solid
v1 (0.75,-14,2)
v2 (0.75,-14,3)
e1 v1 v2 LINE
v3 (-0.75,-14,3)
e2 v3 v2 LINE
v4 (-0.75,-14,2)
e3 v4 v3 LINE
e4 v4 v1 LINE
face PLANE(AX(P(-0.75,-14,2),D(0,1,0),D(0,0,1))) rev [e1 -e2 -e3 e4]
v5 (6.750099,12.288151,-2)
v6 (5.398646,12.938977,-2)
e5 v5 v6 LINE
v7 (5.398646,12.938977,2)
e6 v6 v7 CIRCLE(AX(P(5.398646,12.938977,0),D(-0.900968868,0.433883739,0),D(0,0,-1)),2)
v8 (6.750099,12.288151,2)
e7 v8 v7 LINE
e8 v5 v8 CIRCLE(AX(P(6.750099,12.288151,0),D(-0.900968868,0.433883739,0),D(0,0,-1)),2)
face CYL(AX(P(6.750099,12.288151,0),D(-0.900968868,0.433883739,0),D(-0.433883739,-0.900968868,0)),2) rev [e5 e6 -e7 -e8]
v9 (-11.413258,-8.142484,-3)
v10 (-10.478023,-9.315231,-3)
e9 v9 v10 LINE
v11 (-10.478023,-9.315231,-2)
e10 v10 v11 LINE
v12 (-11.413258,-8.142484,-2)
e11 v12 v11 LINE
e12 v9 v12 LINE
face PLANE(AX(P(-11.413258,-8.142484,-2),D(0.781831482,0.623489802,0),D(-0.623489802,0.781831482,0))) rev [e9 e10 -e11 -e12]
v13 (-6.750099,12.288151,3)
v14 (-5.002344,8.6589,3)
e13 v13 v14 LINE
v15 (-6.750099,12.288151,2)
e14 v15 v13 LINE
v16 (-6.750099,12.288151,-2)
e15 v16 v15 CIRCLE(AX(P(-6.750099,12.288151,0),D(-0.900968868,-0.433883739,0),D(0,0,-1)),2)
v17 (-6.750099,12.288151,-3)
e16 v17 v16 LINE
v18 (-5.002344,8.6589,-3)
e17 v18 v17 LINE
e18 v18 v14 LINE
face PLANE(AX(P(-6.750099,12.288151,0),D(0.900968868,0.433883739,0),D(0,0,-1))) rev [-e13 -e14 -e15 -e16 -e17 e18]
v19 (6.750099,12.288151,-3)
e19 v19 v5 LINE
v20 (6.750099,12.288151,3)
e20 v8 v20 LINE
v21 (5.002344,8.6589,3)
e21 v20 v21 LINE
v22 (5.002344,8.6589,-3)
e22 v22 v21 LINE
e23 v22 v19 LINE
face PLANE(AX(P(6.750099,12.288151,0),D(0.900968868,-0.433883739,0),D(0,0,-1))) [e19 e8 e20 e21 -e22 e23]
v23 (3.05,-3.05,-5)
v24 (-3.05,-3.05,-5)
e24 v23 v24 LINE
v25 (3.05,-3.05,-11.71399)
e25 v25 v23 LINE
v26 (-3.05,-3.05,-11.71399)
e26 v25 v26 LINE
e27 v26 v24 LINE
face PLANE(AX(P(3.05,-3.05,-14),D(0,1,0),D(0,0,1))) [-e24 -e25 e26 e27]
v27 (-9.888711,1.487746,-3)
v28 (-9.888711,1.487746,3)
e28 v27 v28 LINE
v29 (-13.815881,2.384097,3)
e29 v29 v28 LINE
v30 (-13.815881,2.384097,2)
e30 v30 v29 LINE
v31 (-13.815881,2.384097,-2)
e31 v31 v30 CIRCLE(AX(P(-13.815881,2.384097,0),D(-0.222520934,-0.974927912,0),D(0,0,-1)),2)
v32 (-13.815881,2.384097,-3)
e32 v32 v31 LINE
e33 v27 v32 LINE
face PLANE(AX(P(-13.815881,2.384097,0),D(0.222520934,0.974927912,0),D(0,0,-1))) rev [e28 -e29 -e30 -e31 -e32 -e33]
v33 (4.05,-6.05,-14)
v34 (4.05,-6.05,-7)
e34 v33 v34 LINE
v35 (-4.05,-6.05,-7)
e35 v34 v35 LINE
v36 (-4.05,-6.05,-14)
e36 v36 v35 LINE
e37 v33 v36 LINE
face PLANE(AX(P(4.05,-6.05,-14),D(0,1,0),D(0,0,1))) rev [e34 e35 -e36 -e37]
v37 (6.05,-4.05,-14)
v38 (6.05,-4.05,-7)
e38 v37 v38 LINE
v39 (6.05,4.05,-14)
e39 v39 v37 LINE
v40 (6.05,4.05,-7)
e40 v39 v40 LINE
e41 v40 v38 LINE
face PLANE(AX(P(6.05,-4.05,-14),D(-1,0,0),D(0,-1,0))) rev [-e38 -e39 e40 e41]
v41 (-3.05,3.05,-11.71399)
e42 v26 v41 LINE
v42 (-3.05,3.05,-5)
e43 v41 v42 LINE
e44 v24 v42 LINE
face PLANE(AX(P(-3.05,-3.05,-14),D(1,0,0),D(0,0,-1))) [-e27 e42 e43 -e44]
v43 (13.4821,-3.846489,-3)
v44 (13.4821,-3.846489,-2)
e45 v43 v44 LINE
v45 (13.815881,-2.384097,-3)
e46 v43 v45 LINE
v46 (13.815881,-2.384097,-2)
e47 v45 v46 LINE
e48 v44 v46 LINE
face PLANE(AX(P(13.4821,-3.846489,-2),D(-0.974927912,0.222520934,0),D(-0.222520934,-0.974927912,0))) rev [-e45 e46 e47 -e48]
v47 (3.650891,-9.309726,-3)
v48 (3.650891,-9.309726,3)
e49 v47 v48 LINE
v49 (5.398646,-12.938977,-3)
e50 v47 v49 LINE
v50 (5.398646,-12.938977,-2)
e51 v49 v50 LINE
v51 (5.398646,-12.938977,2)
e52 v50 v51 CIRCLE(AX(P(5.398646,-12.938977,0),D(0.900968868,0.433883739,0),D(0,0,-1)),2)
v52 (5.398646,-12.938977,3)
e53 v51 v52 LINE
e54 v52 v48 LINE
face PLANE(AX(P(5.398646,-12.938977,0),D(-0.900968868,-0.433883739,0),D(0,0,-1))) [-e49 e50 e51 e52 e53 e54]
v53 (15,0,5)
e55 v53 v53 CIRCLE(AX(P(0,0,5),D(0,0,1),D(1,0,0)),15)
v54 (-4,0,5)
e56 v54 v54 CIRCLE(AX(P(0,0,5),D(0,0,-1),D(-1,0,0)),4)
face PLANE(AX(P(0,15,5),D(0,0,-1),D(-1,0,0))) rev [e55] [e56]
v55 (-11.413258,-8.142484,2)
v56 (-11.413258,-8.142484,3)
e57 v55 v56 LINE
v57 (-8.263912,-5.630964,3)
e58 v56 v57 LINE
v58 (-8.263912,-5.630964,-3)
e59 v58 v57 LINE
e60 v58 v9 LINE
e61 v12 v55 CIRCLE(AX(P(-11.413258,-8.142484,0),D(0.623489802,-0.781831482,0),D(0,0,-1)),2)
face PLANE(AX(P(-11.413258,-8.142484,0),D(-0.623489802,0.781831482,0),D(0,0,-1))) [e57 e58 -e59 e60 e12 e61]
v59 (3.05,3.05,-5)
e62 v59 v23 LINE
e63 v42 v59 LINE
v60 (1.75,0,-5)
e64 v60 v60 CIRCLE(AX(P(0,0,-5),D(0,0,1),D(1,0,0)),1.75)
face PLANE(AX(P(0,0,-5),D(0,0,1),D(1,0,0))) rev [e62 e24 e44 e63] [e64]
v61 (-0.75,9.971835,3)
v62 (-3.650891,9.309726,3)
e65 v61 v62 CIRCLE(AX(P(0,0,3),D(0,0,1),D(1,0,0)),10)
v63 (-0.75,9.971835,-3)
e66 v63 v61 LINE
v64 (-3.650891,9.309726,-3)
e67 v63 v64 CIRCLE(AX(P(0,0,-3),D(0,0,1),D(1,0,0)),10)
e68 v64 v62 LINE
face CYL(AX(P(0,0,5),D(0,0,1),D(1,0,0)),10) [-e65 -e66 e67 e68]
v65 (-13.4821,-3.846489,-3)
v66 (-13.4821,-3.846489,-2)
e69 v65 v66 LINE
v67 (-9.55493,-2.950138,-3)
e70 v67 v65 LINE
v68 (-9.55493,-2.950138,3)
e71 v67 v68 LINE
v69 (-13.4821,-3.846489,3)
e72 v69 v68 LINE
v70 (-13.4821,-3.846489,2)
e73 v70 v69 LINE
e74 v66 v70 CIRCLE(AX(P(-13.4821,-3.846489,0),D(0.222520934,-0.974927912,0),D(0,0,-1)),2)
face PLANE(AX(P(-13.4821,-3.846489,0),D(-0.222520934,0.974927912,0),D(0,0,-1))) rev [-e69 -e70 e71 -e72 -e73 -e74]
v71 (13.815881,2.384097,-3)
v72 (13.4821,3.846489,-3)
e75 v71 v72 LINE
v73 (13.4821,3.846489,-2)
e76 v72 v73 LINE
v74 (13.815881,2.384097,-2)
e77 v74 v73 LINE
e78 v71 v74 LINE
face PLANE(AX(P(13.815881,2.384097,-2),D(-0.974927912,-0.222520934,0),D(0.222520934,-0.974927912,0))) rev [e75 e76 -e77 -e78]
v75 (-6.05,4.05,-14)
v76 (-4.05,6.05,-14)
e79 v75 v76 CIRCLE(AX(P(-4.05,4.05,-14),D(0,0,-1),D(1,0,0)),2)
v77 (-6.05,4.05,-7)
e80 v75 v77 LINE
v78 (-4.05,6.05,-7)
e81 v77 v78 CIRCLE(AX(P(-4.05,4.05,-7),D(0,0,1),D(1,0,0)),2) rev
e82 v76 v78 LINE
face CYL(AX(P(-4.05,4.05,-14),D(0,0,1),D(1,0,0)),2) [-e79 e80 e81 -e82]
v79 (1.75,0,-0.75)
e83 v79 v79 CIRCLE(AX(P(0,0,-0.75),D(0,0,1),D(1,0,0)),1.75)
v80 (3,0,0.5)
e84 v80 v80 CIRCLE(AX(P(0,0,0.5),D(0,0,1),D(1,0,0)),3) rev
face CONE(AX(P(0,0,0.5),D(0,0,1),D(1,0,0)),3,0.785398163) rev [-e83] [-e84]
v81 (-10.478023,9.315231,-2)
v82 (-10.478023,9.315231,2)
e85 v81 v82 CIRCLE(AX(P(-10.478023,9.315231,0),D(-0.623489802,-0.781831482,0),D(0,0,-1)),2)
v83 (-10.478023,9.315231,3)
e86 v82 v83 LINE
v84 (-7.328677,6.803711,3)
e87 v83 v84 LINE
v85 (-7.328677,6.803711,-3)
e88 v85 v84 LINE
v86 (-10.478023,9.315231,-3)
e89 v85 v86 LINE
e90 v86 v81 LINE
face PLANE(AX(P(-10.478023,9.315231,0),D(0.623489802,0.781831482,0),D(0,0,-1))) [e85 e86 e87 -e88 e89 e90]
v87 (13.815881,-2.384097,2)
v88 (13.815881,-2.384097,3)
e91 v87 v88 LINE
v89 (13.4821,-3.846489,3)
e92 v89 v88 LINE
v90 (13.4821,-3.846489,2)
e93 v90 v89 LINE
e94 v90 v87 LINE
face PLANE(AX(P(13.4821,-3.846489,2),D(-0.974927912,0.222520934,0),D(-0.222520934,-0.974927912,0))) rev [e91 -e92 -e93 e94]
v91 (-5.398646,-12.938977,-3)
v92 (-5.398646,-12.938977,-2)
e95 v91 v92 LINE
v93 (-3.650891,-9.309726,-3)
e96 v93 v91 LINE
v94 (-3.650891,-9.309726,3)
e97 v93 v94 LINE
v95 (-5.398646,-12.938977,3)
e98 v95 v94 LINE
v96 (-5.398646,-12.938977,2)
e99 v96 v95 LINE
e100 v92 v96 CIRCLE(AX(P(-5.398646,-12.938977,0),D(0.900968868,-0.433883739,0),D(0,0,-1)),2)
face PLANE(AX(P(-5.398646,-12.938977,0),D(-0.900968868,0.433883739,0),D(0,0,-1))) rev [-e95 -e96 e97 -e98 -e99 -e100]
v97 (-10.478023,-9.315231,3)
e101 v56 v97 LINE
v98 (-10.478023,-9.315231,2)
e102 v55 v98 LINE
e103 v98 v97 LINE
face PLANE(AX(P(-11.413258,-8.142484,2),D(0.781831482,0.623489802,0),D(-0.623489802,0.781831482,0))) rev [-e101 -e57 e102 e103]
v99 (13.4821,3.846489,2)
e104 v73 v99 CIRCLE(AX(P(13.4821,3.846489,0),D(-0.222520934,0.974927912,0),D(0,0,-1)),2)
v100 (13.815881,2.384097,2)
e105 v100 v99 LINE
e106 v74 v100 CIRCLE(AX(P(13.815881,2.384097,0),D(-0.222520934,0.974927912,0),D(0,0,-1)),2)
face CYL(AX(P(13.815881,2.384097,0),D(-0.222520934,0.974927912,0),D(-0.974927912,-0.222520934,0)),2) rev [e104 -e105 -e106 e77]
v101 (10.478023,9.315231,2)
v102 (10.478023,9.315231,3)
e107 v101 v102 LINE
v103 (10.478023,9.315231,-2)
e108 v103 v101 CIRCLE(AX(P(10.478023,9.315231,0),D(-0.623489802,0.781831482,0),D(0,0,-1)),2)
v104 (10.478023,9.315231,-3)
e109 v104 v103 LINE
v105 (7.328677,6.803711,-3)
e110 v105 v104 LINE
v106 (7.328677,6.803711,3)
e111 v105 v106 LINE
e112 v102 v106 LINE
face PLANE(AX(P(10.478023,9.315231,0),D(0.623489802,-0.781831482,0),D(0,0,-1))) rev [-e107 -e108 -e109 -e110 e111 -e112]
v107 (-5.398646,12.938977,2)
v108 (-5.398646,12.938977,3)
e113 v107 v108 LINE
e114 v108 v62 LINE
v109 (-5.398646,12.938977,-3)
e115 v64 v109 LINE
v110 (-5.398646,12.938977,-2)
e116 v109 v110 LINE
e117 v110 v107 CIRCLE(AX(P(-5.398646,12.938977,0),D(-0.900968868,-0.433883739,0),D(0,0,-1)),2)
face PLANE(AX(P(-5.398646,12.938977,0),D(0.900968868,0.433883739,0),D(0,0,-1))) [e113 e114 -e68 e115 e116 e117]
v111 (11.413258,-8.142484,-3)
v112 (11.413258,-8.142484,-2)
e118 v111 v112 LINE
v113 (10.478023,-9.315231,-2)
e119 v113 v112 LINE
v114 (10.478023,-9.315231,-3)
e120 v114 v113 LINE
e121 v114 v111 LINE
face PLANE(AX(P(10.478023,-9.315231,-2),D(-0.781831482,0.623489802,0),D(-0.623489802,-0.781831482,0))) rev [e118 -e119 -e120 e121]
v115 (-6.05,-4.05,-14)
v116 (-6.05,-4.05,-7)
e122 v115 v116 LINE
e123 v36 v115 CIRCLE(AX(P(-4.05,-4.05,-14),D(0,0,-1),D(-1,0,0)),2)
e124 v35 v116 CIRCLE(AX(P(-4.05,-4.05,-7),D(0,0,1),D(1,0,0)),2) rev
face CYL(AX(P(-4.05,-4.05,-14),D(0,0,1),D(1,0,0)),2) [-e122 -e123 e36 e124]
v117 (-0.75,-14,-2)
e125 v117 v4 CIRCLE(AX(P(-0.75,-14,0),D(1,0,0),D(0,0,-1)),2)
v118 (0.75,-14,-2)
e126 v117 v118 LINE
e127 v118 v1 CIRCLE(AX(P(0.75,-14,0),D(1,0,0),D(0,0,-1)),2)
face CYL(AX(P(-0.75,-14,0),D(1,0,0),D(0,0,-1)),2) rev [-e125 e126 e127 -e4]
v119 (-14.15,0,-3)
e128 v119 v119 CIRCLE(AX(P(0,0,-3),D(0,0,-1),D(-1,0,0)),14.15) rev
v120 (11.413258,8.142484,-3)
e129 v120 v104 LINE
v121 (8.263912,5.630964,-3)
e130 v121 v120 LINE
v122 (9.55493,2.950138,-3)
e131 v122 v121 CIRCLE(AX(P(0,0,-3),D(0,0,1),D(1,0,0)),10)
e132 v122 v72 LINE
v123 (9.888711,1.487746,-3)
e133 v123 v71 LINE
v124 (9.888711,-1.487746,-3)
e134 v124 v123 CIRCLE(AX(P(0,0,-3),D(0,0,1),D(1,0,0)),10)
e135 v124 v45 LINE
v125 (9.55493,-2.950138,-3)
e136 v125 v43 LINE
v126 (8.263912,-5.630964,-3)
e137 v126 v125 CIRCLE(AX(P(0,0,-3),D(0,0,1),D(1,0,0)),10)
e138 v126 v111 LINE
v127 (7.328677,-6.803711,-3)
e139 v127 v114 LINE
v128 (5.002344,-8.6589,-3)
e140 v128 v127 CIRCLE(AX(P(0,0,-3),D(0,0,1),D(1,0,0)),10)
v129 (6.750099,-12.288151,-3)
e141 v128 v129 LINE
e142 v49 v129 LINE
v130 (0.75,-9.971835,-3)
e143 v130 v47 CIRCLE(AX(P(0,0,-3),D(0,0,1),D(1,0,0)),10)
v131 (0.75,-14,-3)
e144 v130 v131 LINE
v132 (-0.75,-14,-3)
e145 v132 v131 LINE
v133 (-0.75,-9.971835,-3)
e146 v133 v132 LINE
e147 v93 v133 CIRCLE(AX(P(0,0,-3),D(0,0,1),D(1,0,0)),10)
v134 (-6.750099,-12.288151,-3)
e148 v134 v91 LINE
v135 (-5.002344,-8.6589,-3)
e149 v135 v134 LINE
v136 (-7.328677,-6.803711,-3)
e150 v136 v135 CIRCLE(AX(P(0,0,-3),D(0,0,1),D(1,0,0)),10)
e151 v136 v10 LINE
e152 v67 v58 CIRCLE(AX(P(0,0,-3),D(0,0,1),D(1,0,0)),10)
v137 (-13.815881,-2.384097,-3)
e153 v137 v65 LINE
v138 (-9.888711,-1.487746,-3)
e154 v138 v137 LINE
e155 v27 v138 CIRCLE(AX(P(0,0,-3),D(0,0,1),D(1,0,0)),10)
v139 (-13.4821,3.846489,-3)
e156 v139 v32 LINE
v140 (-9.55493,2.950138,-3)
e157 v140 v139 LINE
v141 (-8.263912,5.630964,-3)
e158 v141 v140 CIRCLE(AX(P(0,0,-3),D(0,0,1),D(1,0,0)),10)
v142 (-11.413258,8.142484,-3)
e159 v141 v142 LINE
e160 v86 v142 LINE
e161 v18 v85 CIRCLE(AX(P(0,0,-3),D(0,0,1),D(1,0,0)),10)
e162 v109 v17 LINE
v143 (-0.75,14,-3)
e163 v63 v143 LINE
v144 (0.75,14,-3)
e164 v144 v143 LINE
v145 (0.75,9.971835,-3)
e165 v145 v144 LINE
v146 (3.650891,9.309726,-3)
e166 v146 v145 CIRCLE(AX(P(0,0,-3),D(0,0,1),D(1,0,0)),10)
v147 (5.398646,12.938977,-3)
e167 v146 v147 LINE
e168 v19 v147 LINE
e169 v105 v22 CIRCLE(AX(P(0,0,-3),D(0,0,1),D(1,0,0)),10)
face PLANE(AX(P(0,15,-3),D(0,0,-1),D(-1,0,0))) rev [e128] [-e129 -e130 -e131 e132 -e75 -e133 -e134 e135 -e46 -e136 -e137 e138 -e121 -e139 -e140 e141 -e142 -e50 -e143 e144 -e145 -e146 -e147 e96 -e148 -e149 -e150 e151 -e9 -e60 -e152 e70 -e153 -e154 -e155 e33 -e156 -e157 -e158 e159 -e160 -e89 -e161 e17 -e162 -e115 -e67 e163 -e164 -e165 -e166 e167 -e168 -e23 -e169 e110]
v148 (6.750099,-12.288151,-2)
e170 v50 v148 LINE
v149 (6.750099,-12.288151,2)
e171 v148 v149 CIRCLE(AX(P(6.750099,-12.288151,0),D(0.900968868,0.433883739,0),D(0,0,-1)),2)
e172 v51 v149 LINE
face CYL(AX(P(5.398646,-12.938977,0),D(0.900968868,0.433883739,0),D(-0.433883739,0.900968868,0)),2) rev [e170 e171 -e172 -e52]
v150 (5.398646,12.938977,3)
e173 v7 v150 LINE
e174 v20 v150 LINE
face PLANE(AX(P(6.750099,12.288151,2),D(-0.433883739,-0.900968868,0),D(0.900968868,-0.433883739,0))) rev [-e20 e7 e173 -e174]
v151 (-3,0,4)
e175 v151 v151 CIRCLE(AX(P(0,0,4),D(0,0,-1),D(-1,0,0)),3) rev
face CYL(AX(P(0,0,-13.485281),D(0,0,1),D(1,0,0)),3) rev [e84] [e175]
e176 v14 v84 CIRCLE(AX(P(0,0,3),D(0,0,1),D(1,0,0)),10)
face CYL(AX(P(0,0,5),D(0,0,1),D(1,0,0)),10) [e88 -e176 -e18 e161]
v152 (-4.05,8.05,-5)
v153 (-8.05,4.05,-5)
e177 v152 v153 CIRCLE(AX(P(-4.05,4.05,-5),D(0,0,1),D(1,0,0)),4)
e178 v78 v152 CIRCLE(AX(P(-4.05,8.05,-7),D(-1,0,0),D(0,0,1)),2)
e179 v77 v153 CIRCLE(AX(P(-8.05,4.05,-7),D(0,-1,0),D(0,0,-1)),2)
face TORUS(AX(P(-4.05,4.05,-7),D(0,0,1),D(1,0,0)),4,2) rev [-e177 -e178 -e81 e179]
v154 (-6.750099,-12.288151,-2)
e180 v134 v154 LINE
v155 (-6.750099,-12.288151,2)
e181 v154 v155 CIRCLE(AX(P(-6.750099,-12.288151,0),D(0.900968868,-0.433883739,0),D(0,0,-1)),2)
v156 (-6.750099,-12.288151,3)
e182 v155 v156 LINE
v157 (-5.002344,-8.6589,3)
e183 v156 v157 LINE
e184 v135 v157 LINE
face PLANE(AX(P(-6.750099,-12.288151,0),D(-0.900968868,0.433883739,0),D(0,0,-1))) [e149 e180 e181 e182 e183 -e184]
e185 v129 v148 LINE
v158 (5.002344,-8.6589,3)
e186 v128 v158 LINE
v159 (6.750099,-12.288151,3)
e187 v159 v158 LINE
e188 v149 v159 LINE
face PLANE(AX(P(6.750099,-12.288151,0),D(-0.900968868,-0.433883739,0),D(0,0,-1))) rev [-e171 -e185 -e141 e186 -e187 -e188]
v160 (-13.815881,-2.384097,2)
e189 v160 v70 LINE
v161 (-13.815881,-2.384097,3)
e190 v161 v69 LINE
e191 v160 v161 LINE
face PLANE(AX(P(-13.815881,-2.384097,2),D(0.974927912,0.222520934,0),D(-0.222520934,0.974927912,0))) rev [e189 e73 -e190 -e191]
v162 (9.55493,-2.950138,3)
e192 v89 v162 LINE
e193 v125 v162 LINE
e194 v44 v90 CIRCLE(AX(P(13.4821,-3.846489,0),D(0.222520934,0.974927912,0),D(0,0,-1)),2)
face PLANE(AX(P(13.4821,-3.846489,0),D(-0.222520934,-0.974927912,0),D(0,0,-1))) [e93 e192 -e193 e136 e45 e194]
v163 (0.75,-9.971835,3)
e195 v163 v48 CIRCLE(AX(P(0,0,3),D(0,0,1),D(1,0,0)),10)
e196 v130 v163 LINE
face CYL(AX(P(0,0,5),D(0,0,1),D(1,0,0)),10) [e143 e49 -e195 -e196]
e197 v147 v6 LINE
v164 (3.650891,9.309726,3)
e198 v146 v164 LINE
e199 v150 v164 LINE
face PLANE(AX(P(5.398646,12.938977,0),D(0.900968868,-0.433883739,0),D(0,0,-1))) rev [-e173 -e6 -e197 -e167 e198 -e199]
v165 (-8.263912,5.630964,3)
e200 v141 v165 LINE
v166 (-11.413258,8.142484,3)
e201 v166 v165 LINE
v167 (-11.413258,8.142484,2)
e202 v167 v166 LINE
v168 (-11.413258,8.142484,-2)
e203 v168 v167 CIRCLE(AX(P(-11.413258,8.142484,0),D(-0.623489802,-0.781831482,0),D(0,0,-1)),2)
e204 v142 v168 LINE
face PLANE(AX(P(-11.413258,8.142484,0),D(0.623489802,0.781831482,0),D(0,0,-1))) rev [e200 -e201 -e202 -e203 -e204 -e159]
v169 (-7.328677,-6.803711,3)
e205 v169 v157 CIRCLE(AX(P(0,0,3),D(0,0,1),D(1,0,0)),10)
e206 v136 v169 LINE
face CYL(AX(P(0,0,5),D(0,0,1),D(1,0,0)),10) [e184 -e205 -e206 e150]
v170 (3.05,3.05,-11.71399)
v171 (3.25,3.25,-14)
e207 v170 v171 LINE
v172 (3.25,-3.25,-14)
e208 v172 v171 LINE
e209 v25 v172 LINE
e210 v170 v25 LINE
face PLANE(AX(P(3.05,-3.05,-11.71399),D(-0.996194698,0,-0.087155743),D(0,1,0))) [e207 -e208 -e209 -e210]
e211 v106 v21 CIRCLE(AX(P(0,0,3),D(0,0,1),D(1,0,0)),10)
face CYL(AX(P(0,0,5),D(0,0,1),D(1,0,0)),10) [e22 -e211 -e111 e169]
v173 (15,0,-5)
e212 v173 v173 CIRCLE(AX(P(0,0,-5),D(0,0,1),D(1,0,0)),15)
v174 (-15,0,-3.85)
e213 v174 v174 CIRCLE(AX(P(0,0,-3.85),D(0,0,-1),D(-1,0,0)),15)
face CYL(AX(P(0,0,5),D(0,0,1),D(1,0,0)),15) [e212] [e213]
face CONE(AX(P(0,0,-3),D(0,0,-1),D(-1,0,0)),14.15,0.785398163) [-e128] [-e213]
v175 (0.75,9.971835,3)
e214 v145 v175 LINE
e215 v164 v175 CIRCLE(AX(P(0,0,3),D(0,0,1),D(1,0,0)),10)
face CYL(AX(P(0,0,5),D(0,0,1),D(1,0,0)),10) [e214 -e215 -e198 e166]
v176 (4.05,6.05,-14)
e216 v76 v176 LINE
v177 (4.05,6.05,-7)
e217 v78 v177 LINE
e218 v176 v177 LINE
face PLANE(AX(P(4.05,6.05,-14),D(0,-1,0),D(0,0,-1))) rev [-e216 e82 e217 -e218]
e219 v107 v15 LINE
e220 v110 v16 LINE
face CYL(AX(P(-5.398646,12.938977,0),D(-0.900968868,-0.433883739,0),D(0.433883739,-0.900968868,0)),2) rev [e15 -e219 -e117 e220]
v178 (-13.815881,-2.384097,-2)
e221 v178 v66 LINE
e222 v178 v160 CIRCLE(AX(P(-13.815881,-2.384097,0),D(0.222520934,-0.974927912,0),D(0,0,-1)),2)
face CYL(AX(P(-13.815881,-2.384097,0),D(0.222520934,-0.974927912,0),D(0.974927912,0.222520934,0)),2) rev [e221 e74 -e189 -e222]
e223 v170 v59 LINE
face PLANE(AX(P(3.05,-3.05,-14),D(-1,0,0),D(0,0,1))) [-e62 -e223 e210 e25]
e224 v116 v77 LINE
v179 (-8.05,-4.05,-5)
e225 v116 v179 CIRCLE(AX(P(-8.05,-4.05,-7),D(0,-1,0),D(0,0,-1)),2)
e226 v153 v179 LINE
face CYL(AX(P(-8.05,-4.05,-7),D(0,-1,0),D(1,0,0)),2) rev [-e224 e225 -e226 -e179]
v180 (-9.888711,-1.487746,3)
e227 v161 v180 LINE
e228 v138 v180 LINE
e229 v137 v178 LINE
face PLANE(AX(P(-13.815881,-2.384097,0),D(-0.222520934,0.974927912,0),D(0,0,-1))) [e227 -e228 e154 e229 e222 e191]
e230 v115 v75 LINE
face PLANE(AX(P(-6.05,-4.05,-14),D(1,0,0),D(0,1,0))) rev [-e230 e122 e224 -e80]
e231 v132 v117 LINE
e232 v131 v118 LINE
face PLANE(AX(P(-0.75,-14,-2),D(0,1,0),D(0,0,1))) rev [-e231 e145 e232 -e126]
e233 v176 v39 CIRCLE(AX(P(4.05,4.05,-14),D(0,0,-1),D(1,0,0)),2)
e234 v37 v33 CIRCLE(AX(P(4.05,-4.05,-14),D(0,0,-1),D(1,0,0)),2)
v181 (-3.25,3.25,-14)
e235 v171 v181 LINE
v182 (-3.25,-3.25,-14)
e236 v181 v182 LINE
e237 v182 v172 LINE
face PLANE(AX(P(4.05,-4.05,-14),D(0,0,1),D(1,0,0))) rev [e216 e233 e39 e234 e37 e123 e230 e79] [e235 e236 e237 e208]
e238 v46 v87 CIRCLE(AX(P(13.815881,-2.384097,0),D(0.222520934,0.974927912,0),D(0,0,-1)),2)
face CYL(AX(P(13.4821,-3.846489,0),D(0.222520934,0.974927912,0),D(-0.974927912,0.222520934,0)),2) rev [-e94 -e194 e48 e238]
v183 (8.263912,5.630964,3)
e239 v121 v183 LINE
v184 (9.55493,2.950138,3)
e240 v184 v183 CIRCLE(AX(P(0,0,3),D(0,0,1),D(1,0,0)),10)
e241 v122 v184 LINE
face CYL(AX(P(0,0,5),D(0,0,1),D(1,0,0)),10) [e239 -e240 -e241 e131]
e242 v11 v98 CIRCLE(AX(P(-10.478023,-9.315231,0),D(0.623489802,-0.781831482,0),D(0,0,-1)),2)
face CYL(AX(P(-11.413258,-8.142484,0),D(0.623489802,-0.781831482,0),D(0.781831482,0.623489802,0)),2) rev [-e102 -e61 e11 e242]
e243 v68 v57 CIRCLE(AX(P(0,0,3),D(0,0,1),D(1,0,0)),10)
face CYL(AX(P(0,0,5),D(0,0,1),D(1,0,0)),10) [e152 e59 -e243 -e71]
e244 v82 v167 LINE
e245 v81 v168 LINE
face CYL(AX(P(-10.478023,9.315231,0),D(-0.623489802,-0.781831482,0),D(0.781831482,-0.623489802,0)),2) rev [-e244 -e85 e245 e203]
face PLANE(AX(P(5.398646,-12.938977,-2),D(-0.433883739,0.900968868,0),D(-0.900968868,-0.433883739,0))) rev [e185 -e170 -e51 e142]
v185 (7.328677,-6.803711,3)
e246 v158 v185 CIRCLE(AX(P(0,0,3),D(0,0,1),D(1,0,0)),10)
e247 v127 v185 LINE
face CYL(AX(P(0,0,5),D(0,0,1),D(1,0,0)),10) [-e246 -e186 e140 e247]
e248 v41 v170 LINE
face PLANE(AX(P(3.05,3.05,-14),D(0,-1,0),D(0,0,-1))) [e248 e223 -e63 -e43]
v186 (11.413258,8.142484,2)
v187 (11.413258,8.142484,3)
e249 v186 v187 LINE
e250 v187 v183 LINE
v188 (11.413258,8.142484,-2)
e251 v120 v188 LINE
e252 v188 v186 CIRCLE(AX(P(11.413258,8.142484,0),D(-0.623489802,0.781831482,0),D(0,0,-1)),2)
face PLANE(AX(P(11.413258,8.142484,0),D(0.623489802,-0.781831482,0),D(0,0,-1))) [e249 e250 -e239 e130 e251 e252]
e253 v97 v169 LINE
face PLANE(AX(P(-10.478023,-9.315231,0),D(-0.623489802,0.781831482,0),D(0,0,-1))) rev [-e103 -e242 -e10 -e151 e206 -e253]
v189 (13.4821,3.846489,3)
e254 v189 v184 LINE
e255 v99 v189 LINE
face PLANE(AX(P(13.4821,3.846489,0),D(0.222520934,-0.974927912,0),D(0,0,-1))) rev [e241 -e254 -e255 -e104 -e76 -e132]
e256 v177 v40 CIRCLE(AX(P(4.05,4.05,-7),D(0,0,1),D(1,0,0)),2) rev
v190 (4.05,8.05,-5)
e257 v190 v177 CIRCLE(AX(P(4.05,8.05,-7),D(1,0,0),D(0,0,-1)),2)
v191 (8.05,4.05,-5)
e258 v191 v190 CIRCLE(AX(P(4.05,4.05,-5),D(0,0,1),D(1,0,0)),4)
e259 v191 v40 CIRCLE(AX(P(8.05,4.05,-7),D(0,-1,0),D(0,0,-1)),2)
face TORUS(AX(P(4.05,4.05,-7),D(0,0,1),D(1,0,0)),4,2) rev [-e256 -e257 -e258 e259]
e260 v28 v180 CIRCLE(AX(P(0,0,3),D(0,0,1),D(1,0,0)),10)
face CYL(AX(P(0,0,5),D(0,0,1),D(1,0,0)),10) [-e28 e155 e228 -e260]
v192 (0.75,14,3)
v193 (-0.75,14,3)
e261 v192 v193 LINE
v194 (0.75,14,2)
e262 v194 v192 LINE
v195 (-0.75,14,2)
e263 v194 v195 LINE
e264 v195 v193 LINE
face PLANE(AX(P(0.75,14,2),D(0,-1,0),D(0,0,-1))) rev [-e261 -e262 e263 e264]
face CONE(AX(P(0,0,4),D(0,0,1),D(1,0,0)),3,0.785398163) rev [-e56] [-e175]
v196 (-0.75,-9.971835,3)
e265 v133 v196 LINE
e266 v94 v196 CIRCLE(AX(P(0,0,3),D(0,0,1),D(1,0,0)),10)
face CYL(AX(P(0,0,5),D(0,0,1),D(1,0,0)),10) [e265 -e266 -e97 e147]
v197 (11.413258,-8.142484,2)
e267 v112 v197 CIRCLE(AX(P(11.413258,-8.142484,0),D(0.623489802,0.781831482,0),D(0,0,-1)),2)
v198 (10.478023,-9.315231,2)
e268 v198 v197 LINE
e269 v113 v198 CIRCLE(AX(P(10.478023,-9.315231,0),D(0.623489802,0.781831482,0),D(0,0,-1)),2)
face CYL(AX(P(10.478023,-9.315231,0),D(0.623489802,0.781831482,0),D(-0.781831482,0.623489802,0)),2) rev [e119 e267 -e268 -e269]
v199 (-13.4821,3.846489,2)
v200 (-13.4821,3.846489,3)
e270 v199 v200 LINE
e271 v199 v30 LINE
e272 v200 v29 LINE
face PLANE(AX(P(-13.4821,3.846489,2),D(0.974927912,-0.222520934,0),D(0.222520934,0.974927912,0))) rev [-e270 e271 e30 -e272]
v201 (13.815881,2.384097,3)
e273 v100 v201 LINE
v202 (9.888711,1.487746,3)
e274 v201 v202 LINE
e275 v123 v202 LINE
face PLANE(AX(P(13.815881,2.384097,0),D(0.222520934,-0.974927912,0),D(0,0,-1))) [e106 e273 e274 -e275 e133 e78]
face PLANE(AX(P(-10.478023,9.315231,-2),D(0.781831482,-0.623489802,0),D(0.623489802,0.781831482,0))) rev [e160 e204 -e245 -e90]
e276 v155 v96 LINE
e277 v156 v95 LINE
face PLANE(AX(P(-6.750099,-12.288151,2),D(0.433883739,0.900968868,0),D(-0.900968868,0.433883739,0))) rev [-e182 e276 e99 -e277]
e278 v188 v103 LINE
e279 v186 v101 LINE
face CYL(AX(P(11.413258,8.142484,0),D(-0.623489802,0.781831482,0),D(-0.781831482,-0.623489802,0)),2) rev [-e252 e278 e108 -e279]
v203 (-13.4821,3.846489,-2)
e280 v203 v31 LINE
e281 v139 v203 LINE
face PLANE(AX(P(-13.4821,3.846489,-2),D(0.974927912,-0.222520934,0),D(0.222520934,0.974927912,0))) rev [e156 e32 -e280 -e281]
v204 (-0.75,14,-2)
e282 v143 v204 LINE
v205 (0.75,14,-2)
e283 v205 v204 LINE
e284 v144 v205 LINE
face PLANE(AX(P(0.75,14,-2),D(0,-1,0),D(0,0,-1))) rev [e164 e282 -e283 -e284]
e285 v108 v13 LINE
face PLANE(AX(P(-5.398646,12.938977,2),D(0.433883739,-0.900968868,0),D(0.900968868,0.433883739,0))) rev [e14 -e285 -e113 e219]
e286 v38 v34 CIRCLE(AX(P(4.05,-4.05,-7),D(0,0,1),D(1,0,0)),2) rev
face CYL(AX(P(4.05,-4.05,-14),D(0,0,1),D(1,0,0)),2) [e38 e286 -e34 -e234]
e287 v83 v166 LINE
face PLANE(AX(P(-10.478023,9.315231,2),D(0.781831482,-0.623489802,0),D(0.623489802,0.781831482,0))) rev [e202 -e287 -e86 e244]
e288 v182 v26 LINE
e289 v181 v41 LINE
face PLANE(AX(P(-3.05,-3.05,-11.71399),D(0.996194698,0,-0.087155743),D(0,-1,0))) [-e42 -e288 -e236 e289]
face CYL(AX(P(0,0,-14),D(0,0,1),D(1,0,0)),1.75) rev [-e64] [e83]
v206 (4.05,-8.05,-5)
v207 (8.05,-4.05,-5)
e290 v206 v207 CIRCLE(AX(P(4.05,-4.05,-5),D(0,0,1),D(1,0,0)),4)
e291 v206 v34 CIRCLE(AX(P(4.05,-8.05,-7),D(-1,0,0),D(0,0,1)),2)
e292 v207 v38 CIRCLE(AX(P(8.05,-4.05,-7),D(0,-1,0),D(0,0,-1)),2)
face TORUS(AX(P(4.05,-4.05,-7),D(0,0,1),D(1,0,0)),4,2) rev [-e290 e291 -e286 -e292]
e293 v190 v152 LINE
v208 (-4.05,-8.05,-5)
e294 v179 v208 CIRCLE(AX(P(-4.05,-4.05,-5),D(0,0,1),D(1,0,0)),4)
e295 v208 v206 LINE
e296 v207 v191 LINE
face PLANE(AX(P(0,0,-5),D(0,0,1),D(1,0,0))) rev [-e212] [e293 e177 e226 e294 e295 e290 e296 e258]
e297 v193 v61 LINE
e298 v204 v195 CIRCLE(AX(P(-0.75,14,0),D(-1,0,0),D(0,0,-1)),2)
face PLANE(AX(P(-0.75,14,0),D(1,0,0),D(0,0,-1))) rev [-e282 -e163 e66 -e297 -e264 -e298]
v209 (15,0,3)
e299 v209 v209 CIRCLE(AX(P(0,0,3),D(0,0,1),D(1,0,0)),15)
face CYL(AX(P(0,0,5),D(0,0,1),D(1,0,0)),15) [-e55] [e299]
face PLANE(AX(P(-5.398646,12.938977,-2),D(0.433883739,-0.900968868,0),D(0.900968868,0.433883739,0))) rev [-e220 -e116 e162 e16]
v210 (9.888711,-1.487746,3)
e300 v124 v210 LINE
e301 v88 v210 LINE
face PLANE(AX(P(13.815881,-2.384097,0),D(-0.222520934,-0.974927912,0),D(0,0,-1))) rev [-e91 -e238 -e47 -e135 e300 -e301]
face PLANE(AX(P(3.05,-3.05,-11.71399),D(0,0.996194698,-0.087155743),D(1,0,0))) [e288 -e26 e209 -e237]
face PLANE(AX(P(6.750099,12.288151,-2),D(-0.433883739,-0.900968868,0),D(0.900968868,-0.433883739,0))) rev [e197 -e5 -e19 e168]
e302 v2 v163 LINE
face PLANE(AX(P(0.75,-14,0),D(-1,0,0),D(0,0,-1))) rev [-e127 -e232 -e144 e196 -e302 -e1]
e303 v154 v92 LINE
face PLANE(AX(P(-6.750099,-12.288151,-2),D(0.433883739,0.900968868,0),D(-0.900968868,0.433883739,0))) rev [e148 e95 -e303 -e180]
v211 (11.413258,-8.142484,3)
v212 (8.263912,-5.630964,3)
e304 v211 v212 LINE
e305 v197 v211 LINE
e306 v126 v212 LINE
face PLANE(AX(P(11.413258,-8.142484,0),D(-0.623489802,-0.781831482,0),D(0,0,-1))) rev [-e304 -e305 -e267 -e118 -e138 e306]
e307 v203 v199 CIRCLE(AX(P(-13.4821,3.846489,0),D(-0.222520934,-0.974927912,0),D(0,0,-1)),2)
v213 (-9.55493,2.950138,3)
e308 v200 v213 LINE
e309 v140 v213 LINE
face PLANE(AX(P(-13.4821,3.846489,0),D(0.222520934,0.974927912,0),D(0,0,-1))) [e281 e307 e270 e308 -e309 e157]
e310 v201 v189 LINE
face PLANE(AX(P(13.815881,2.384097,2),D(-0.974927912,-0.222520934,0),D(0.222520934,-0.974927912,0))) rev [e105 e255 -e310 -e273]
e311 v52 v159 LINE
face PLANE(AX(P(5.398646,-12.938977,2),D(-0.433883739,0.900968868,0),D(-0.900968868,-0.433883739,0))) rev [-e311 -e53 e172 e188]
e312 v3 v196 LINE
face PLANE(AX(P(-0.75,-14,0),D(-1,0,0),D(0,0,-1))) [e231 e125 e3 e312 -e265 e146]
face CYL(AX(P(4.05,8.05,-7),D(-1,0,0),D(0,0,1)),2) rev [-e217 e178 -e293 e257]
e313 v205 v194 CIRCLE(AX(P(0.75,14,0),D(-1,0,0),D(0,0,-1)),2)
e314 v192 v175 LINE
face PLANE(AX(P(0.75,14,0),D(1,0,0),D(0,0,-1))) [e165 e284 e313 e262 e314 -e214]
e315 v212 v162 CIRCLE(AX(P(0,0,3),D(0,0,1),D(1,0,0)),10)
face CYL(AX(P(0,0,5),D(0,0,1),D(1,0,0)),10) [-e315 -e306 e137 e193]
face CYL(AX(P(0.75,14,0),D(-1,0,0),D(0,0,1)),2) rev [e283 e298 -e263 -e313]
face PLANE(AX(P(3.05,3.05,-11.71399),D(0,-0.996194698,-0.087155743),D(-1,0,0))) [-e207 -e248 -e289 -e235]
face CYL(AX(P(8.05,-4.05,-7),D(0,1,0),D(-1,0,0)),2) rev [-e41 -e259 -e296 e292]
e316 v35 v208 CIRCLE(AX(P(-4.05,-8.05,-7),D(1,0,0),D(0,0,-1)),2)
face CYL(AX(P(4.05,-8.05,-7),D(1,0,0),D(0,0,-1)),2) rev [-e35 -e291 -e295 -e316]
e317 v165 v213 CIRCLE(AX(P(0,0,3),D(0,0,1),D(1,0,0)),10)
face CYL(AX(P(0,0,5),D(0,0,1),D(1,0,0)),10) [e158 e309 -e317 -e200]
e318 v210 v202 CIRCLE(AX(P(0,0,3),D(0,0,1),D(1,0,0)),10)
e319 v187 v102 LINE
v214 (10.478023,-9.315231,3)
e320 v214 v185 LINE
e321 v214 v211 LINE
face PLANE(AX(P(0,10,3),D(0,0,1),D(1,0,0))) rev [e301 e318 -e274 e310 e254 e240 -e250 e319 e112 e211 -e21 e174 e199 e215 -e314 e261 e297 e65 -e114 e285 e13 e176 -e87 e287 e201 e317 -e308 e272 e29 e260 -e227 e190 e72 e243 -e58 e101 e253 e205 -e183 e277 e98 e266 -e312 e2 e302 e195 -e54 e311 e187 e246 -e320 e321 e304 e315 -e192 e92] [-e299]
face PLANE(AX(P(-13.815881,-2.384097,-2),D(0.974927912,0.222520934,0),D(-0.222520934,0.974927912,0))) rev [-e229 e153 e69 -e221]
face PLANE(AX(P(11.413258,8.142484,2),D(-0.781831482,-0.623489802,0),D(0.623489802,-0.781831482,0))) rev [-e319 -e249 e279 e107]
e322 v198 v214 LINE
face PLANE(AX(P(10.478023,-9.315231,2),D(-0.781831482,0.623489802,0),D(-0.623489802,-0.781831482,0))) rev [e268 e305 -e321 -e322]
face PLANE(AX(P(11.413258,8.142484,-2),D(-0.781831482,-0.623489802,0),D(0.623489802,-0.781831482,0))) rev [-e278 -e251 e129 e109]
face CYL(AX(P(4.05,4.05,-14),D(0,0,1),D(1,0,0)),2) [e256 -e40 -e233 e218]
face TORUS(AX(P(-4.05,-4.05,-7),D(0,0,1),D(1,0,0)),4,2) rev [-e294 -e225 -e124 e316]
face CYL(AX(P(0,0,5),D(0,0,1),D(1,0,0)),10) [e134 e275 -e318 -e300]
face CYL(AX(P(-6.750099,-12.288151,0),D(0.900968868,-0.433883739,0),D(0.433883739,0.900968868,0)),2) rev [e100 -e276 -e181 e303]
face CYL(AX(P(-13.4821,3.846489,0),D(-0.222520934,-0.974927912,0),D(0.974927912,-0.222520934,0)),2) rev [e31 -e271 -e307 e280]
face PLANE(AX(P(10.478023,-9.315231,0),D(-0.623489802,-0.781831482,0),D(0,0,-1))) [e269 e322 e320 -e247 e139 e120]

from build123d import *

# Parameters (mm, degrees)
EXTRUDE_1_DEPTH          = 0.75
PATTERN_CIRCULAR_1_COUNT = 14
SKETCH_3_W               = 6.1
SKETCH_3_H               = 6.1
EXTRUDE_2_DEPTH          = 9
FILLET_1_R               = 2
CHAMFER_1_SIZE           = 0.2
CHAMFER_1_SIZE2          = 2.286010461
SKETCH_4_R               = 1.75
CUT_EXTRUDE_1_DEPTH      = 29.478061732
SKETCH_6_R               = 3
CUT_EXTRUDE_2_DEPTH      = 6
CHAMFER_2_SIZE           = 1
CHAMFER_3_SIZE           = 1.5
CHAMFER_4_SIZE           = 0.85


with BuildPart() as part:
    # 草圖1 → 旋轉1 (revolve)
    with BuildSketch(Plane(origin=(0, 0, 0), x_dir=(0, 0, -1), z_dir=(1, 0, 0)), mode=Mode.PRIVATE) as revolve_1_sk:
        Polygon((-5, 0), (5, 0), (5, 15), (3, 15), (3, 10), (-3, 10), (-3, 15), (-5, 15), align=None)
    revolve(revolve_1_sk.sketch.rotate(Axis((0, 0, 5), (0, 0, -1)), 90), axis=Axis((0, 0, 5), (0, 0, -1)))

    # 草圖2 → 填料-伸長1 (add, symmetric)
    with BuildSketch(Plane(origin=(0, 0, 0), x_dir=(0, 0, -1), z_dir=(1, 0, 0))):
        with BuildLine():
            Line((3, 10), (3, 14))
            Line((3, 14), (2, 14))
            ThreePointArc((2, 14), (0, 12), (-2, 14))
            Line((-2, 14), (-3, 14))
            Line((-3, 14), (-3, 10))
            Line((-3, 10), (-3, 8.5))
            Line((-3, 8.5), (3, 8.5))
            Line((3, 8.5), (3, 10))
        make_face()
    extrude_1 = extrude(amount=EXTRUDE_1_DEPTH, both=True)

    # 環狀複製排列1: 填料-伸長1 ×14 about axis
    pattern_circular_1_axis = Axis((0, 0, 0), (0, 0, 1))
    for i in range(1, PATTERN_CIRCULAR_1_COUNT):
        add(extrude_1.rotate(pattern_circular_1_axis, i * 360 / PATTERN_CIRCULAR_1_COUNT))

    # 草圖3 → 填料-伸長2 (add)
    with BuildSketch(Plane(origin=(0, 0, -5), x_dir=(-1, 0, 0), z_dir=(0, 0, -1))):
        with BuildLine():
            Line((-4.05, -6.05), (4.05, -6.05))
            ThreePointArc((4.05, -6.05), (5.464213562, -5.464213562), (6.05, -4.05))
            Line((6.05, -4.05), (6.05, 4.05))
            ThreePointArc((6.05, 4.05), (5.464213562, 5.464213562), (4.05, 6.05))
            Line((4.05, 6.05), (-4.05, 6.05))
            ThreePointArc((-4.05, 6.05), (-5.464213562, 5.464213562), (-6.05, 4.05))
            Line((-6.05, 4.05), (-6.05, -4.05))
            ThreePointArc((-6.05, -4.05), (-5.464213562, -5.464213562), (-4.05, -6.05))
        make_face()
        Rectangle(SKETCH_3_W, SKETCH_3_H, mode=Mode.SUBTRACT)
    extrude(amount=EXTRUDE_2_DEPTH)

    # 圓角1
    fillet_1_edges = [part.edges().sort_by_distance(p)[0] for p in [
        (5.464213562, -5.464213562, -5),
        (0, -6.05, -5),
        (-5.464213562, -5.464213562, -5),
        (-6.05, 0, -5),
        (-5.464213562, 5.464213562, -5),
        (0, 6.05, -5),
        (5.464213562, 5.464213562, -5),
        (6.05, 0, -5),
    ]]
    fillet(fillet_1_edges, radius=FILLET_1_R)

    # 導角1
    chamfer_1_edges = [part.edges().sort_by_distance(p)[0] for p in [
        (-3.05, 0, -14),
        (0, 3.05, -14),
        (3.05, 0, -14),
        (0, -3.05, -14),
    ]]
    chamfer_1_side = [part.faces().sort_by_distance(p)[0] for p in [
        (5.343213562, -5.343213562, -14),
    ]]
    chamfer(chamfer_1_edges, length=CHAMFER_1_SIZE, length2=CHAMFER_1_SIZE2, reference=chamfer_1_side[0])

    # 草圖4 → 除料-伸長1 (cut, through all)
    with BuildSketch(Plane.XY.offset(5)):
        Circle(SKETCH_4_R)
    extrude(amount=-CUT_EXTRUDE_1_DEPTH, mode=Mode.SUBTRACT)

    # 草圖6 → 除料-伸長2 (cut)
    with BuildSketch(Plane.XY.offset(5)):
        Circle(SKETCH_6_R)
    extrude(amount=-CUT_EXTRUDE_2_DEPTH, mode=Mode.SUBTRACT)

    # 導角2
    chamfer_2_edges = [part.edges().sort_by_distance(p)[0] for p in [
        (-3, 0, 5),
    ]]
    chamfer(chamfer_2_edges, length=CHAMFER_2_SIZE)

    # 導角3
    # the kernel refuses this chamfer: 1.5 mm, written as the material it adds along each edge
    with BuildSketch(Plane(origin=(0, 0, -1), x_dir=(1, 0, 0), z_dir=(0, -1, 0))) as chamfer_3_piece_1_section:
        Polygon((3, CHAMFER_3_SIZE), (3 - CHAMFER_3_SIZE, 0), (3, 0), align=None)
    chamfer_3_piece_1 = revolve(axis=Axis((0, 0, -1), (0, 0, 1)), mode=Mode.PRIVATE)
    chamfer_3_piece_1 = chamfer_3_piece_1 - Plane(origin=(0, 0, -0.122651597), x_dir=(1, 0, 0), z_dir=(0, 0, 1)) * Cylinder(1.75, 12, mode=Mode.PRIVATE)
    add(chamfer_3_piece_1)

    # 導角4
    chamfer_4_edges = [part.edges().sort_by_distance(p)[0] for p in [
        (-15, 0, -3),
    ]]
    chamfer(chamfer_4_edges, length=CHAMFER_4_SIZE)


solid = part.part
